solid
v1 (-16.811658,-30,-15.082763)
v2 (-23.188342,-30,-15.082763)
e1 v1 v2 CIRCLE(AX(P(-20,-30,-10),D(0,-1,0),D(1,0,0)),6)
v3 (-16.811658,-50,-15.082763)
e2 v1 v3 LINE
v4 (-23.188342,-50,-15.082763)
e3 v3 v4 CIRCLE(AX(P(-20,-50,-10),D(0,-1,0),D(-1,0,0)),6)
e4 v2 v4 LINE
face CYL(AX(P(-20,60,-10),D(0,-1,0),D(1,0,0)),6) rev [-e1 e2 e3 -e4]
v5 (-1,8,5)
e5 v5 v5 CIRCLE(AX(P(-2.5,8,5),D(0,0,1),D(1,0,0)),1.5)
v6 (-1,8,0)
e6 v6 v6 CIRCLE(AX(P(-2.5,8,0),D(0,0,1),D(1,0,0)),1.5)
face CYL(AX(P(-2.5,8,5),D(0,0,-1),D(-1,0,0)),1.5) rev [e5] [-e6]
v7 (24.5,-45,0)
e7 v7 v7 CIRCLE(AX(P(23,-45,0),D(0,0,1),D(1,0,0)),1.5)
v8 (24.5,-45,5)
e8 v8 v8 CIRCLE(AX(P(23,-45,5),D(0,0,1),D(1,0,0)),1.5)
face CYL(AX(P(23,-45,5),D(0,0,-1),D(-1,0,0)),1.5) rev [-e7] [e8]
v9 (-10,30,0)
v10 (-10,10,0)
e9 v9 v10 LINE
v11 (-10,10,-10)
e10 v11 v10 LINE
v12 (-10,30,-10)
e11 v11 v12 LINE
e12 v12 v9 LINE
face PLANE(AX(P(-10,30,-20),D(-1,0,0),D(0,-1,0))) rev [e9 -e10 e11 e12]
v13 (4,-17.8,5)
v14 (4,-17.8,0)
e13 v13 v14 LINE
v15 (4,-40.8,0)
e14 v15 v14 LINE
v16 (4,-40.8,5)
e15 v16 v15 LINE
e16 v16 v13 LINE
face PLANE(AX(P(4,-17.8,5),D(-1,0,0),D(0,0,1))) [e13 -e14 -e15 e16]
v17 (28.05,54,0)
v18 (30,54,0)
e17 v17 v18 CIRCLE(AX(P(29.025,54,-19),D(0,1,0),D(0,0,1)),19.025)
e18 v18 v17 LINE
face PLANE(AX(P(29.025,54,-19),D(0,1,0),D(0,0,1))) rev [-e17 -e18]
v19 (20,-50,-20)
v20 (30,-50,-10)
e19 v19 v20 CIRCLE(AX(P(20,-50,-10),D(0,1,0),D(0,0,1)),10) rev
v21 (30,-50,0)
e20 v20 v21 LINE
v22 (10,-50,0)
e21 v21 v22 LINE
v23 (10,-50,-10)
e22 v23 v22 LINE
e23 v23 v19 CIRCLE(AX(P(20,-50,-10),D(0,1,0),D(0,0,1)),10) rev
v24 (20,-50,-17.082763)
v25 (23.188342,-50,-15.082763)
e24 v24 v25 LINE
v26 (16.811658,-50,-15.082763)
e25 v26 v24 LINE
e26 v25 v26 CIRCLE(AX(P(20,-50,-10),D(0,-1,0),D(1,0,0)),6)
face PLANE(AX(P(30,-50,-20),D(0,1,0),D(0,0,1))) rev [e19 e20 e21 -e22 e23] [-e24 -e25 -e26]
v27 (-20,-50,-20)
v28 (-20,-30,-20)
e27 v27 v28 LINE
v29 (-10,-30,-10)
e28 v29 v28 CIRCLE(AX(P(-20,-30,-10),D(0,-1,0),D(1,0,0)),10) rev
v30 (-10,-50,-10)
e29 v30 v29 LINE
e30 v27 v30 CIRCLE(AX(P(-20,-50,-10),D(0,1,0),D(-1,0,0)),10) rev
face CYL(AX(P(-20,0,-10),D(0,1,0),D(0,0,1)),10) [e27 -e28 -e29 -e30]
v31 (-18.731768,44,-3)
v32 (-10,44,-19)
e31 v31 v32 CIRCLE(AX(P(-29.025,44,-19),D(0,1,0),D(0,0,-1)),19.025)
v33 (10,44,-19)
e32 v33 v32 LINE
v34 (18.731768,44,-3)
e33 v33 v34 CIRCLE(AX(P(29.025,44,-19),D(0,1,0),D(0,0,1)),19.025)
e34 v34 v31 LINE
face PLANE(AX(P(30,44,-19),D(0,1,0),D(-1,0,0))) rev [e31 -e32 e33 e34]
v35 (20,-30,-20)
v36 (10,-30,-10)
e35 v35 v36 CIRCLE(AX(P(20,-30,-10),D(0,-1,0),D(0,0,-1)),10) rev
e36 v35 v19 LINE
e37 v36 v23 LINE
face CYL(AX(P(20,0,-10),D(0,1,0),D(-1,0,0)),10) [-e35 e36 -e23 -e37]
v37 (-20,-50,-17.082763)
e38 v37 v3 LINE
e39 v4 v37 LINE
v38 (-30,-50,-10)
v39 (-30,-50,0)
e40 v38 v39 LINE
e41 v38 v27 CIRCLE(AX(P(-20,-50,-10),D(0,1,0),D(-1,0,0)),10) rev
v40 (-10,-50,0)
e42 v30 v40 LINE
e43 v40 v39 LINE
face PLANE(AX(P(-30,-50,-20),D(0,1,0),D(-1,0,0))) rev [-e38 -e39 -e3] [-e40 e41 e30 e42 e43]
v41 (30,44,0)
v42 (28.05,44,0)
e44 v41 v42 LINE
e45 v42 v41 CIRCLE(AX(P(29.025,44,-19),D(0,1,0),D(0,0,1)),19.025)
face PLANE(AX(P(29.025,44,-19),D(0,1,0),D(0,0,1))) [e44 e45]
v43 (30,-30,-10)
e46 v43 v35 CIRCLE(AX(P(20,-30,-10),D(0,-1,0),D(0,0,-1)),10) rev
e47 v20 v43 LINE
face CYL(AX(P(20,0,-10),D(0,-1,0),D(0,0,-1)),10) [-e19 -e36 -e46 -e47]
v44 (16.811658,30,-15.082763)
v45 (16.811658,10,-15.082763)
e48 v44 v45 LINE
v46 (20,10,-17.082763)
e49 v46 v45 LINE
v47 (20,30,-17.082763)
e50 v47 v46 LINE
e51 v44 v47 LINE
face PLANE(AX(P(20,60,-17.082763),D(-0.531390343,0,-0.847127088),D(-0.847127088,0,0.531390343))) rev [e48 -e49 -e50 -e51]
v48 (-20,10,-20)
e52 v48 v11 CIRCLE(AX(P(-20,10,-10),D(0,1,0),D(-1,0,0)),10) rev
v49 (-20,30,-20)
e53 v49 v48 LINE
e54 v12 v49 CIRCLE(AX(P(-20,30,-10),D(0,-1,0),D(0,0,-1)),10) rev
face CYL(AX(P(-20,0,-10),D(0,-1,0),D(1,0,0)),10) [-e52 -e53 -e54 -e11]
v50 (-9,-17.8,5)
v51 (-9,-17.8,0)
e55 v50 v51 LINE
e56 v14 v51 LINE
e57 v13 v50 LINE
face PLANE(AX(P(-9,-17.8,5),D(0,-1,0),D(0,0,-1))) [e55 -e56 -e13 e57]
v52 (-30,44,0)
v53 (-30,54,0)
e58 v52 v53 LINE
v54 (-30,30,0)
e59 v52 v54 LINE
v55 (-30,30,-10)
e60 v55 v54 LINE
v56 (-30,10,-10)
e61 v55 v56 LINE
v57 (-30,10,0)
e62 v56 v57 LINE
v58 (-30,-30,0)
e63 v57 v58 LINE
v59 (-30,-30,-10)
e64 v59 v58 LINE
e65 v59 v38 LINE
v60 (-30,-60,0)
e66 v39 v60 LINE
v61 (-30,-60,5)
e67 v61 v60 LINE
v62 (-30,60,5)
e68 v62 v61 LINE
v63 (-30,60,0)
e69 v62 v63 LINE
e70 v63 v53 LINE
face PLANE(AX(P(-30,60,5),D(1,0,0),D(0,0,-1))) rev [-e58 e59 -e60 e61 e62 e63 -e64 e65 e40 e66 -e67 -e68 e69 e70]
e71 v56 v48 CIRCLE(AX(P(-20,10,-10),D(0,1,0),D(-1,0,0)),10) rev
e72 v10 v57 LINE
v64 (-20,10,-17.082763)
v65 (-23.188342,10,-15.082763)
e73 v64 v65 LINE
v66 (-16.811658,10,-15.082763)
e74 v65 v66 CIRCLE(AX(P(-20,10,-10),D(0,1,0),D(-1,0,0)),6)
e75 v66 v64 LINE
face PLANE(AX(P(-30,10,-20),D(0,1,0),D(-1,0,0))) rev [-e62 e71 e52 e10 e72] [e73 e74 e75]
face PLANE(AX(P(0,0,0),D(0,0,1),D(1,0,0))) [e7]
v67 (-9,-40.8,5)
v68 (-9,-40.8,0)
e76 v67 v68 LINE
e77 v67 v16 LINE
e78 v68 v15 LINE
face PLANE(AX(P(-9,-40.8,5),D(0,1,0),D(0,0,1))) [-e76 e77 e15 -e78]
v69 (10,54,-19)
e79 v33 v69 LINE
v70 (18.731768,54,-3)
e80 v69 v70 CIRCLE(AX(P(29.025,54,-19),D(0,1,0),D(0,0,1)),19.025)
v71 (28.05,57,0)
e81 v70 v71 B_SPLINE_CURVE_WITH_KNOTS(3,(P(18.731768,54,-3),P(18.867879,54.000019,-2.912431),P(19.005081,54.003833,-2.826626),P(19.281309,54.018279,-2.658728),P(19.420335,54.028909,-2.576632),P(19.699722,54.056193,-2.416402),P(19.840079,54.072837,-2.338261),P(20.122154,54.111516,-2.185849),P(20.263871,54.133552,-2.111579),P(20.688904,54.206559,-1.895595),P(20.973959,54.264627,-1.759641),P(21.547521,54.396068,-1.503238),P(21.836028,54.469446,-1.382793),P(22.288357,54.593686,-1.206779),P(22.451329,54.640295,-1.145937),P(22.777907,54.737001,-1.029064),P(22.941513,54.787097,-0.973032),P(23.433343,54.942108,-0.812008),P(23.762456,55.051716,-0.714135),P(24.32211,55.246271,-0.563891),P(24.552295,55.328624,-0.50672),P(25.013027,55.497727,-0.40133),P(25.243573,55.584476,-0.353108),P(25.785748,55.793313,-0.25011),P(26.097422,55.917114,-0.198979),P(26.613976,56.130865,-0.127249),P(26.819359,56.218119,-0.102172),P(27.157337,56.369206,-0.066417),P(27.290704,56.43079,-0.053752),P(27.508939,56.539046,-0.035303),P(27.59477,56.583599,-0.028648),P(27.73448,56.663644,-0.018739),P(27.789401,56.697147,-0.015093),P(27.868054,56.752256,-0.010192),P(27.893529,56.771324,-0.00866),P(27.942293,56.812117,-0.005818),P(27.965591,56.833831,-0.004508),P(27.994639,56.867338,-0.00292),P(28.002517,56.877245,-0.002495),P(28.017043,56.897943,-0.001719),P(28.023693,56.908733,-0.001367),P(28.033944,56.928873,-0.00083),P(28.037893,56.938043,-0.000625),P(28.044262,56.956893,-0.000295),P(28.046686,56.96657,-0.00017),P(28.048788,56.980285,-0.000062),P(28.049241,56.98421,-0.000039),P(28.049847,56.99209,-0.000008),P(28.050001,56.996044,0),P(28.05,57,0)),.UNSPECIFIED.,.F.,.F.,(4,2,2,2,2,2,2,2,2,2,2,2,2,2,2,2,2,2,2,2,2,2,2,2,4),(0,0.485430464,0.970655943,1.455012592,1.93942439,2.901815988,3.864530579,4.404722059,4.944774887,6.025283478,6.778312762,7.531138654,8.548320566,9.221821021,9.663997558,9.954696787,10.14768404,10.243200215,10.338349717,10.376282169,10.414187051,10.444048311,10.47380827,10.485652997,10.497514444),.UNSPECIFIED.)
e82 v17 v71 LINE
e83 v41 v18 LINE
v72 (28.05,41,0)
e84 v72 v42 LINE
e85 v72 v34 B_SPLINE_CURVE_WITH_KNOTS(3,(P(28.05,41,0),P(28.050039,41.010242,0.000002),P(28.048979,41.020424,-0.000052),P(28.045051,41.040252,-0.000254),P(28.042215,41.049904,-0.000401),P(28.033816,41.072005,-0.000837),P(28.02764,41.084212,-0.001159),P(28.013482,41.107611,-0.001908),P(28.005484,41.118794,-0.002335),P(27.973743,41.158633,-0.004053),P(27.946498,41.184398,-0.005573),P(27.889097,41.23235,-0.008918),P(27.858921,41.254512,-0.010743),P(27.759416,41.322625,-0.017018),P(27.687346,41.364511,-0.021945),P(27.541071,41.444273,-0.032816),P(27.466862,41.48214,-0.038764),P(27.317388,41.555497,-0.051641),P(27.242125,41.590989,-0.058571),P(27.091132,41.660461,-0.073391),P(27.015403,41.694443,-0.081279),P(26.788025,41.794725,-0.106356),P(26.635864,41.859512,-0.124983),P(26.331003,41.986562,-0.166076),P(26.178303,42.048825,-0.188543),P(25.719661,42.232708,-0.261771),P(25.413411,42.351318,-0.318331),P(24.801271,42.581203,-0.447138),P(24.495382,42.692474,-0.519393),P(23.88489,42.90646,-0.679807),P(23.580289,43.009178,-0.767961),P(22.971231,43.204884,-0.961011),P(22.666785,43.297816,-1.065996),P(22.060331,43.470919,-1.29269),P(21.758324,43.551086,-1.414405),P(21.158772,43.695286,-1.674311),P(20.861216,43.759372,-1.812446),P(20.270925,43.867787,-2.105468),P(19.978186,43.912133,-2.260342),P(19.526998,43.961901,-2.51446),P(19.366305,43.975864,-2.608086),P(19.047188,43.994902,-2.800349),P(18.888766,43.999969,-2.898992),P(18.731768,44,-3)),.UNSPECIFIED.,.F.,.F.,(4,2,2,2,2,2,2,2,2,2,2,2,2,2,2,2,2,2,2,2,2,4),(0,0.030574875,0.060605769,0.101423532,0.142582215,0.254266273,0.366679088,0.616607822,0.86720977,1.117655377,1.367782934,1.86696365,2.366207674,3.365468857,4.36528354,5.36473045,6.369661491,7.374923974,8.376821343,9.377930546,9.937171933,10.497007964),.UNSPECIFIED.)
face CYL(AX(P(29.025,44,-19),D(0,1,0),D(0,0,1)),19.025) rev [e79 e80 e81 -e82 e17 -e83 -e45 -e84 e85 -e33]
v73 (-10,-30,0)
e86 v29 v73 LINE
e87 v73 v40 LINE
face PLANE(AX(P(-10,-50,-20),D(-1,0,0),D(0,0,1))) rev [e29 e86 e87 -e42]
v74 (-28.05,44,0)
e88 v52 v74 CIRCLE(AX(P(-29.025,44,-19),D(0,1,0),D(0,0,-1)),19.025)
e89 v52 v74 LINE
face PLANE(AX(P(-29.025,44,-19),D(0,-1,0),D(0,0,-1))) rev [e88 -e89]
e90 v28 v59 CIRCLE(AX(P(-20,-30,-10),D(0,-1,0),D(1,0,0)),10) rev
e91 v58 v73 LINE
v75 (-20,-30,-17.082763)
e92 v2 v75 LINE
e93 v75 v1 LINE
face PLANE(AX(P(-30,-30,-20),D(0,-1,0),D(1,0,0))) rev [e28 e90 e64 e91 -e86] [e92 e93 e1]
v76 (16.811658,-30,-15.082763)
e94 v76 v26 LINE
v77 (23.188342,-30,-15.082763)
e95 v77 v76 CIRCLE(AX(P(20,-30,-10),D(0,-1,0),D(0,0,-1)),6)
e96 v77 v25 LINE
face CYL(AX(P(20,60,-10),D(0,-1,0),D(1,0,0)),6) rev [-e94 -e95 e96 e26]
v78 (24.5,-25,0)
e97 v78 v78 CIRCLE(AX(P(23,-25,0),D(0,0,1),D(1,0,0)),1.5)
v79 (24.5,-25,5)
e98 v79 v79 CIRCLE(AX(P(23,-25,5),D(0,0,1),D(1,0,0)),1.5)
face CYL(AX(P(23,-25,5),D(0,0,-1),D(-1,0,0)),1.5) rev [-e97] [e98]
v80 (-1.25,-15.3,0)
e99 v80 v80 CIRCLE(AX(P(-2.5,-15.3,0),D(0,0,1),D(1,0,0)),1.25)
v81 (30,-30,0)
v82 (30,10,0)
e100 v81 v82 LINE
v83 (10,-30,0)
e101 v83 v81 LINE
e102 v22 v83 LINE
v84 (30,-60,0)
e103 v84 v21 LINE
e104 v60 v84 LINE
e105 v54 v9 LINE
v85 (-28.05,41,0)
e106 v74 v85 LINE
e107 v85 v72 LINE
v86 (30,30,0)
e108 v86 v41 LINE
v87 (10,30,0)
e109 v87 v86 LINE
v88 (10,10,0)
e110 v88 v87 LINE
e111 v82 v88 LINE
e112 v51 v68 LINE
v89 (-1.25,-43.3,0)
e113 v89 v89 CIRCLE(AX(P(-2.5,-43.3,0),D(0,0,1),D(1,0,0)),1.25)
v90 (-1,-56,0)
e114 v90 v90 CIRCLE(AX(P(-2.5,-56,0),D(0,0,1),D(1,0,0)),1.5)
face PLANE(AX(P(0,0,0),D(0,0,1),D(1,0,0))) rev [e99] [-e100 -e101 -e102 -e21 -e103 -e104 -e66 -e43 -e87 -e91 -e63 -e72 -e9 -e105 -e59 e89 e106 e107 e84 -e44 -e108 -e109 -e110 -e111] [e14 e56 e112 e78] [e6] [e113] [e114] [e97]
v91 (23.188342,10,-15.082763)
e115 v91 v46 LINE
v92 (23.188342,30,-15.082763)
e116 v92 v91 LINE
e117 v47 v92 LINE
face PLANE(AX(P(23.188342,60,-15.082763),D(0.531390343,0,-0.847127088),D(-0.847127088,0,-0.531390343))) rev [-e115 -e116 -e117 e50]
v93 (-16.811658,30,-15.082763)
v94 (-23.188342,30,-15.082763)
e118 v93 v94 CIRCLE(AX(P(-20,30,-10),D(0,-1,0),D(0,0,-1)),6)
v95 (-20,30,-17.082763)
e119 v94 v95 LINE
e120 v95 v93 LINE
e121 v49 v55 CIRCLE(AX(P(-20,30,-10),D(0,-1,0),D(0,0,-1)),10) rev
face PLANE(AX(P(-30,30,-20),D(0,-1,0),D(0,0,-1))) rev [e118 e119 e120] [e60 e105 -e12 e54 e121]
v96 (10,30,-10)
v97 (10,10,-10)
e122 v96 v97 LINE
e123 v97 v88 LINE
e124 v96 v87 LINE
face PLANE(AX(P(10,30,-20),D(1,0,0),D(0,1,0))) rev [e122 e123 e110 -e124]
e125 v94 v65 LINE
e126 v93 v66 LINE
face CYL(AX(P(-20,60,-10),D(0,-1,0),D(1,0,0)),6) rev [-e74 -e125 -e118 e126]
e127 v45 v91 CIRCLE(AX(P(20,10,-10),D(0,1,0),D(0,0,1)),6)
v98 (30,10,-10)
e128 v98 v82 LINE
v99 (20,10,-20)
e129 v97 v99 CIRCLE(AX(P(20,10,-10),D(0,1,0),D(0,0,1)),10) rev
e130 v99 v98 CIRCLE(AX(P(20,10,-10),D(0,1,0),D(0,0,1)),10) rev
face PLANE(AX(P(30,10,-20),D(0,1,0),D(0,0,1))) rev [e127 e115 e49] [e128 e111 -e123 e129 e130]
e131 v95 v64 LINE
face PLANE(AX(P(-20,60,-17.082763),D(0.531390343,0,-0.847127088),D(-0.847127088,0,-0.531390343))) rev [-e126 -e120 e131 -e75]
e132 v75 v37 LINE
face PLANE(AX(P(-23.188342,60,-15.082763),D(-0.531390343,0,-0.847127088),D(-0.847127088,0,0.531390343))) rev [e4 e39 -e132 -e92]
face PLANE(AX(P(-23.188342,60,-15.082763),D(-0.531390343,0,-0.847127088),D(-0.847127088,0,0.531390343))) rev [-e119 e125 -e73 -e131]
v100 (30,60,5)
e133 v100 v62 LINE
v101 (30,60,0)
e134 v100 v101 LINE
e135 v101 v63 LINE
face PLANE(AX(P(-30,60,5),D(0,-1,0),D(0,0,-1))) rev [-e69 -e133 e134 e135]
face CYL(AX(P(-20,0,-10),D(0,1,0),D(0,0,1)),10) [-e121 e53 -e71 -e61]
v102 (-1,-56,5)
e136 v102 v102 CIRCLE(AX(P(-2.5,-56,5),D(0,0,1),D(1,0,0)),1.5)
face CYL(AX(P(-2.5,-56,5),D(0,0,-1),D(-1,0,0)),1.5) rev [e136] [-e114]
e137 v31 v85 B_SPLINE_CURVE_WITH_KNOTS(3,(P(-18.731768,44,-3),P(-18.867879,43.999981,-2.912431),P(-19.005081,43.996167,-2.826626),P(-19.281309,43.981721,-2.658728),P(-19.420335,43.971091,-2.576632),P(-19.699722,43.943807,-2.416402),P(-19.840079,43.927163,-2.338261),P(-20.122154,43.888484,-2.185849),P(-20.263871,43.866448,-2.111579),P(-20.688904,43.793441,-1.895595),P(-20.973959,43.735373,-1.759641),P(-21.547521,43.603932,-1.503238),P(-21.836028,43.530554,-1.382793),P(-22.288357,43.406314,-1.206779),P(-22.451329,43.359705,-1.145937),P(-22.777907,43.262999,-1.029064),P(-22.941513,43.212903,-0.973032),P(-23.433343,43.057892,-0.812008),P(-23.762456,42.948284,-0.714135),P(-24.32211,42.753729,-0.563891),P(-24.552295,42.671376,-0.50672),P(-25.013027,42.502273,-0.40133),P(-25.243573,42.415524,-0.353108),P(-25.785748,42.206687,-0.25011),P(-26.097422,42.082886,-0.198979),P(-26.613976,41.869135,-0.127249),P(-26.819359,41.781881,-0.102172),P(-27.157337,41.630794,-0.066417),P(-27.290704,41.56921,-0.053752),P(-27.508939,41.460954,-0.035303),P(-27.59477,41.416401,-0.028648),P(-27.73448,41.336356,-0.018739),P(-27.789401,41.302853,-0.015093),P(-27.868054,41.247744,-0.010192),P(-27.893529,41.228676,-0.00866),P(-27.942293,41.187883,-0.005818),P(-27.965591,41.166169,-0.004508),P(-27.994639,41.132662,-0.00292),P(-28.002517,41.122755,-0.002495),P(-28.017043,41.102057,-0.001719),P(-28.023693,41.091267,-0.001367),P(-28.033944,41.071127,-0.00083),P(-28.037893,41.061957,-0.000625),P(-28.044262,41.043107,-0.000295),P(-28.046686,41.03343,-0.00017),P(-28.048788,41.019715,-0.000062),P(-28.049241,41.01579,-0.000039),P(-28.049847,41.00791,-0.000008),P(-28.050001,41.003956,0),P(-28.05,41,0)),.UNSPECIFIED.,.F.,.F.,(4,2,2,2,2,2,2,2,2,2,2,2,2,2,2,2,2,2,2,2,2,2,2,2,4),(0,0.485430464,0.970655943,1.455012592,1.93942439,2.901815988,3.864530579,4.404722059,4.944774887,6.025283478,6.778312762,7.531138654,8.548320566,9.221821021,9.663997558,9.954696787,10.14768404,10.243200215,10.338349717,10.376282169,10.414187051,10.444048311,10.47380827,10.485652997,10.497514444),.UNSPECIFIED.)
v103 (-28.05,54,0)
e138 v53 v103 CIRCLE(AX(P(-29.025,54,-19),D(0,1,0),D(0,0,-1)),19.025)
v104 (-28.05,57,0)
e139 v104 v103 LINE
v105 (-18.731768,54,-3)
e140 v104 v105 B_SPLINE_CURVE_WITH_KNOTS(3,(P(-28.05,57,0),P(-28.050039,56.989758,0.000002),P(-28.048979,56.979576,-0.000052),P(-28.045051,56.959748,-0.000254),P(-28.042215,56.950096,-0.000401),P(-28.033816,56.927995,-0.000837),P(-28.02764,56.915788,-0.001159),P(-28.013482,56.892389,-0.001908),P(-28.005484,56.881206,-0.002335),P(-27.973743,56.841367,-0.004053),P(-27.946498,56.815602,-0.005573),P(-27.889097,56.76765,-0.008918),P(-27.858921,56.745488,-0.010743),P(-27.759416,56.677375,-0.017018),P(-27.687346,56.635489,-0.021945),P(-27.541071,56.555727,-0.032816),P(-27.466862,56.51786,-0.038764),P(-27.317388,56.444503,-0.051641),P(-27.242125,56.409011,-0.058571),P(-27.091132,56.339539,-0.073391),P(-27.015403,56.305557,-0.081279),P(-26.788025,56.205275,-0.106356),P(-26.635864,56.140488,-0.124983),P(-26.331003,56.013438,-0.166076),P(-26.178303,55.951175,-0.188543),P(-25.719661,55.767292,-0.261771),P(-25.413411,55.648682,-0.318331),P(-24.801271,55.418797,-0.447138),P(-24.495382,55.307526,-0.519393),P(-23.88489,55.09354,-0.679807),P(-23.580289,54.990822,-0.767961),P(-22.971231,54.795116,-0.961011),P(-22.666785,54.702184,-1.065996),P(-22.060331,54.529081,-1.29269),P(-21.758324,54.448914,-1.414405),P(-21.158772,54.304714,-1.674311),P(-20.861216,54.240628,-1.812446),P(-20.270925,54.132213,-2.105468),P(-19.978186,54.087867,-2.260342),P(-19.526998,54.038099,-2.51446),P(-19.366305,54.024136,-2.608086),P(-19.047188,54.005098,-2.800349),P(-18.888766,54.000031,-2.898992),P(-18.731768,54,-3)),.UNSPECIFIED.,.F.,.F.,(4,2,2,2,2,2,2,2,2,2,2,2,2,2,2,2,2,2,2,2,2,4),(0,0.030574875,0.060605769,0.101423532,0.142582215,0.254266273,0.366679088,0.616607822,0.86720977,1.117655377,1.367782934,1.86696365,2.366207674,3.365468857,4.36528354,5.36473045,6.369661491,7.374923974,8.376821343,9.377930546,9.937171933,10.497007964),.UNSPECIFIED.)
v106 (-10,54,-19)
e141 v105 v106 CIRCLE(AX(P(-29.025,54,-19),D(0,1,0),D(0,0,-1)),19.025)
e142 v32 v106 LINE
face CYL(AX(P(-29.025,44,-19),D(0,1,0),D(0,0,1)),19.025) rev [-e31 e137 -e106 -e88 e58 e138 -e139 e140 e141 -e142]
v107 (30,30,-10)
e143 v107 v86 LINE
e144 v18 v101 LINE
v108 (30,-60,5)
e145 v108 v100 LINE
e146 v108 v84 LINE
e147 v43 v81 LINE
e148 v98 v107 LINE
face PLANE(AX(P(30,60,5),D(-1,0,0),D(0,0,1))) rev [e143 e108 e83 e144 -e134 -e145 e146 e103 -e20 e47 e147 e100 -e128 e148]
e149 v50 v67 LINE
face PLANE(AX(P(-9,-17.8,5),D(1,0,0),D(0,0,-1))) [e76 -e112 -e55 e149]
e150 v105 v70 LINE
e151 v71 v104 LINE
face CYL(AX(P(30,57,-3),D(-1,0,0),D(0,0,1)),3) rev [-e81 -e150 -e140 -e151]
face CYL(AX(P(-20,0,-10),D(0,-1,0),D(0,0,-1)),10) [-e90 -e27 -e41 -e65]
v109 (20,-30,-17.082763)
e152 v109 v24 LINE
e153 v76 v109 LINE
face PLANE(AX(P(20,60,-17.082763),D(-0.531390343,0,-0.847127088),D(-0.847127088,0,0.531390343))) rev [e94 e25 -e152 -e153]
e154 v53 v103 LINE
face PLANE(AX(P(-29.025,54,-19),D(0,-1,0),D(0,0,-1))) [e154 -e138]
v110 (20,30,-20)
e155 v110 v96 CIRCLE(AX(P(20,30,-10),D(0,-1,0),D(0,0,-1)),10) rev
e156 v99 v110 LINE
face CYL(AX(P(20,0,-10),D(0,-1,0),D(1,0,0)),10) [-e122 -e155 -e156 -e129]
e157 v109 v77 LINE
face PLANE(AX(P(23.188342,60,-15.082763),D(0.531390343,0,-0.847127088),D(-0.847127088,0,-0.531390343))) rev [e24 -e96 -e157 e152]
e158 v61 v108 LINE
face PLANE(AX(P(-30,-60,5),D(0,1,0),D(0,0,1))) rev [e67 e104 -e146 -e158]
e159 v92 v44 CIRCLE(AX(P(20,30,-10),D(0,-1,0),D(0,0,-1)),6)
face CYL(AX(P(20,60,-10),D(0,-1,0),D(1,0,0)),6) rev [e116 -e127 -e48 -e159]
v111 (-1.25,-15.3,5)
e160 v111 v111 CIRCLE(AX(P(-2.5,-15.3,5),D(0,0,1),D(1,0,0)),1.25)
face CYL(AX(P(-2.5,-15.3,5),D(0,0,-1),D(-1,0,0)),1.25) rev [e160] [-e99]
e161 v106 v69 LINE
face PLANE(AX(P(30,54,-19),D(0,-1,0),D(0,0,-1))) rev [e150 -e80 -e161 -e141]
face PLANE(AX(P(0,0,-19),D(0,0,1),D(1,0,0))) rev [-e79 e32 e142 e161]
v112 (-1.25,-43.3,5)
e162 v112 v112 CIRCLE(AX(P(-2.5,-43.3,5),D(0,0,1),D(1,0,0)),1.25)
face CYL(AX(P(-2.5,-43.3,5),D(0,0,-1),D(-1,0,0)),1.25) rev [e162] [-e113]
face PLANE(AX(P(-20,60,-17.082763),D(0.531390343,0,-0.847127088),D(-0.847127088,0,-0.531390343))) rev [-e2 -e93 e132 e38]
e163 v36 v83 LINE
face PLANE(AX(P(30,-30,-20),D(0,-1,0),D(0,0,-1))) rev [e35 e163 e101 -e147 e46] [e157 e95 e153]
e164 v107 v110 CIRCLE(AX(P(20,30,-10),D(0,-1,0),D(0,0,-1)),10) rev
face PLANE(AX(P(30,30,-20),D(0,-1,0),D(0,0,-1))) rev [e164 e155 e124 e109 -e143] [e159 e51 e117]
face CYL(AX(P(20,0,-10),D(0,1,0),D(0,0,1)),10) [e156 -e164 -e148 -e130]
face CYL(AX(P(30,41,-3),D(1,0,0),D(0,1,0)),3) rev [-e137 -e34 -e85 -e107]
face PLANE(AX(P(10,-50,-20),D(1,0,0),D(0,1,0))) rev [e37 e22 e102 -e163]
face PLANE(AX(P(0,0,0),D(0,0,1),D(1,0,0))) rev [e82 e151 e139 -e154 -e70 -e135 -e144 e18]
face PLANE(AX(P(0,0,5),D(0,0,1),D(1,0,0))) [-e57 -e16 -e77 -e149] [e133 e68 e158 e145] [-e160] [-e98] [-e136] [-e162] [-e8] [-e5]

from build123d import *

# Parameters (mm, degrees)
SKETCH1_W           = 60
SKETCH1_H           = 120
SKETCH1_R           = 1.5
SKETCH1_R_2         = 1.25
SKETCH1_W_2         = 13
SKETCH1_H_2         = 23
BOSS_EXTRUDE1_DEPTH = 5
SKETCH2_W           = 20
SKETCH2_H           = 20
BOSS_EXTRUDE2_DEPTH = 20
CUT_EXTRUDE1_DEPTH  = 116.758369028
FILLET1_R           = 10
SKETCH4_W           = 60
SKETCH4_H           = 10
BOSS_EXTRUDE3_DEPTH = 19
CUT_EXTRUDE2_DEPTH  = 10
FILLET2_R           = 3


with BuildPart() as part:
    # Sketch1 → Boss-Extrude1 (new body)
    with BuildSketch(Plane.XY):
        Rectangle(SKETCH1_W, SKETCH1_H)
        with Locations((23, -25)):
            Circle(SKETCH1_R, mode=Mode.SUBTRACT)
        with Locations((23, -45)):
            Circle(SKETCH1_R, mode=Mode.SUBTRACT)
        with Locations((-2.5, -56)):
            Circle(SKETCH1_R, mode=Mode.SUBTRACT)
        with Locations((-2.5, 8)):
            Circle(SKETCH1_R, mode=Mode.SUBTRACT)
        with Locations((-2.5, -15.3)):
            Circle(SKETCH1_R_2, mode=Mode.SUBTRACT)
        with Locations((-2.5, -43.3)):
            Circle(SKETCH1_R_2, mode=Mode.SUBTRACT)
        with Locations((-2.5, -29.3)):
            Rectangle(SKETCH1_W_2, SKETCH1_H_2, mode=Mode.SUBTRACT)
    extrude(amount=BOSS_EXTRUDE1_DEPTH)

    # Sketch2 → Boss-Extrude2 (add)
    with BuildSketch(Plane(origin=(0, 0, 0), x_dir=(-1, 0, 0), z_dir=(0, 0, -1))):
        with Locations((-20, -40)):
            Rectangle(SKETCH2_W, SKETCH2_H)
        with Locations((20, -40)):
            Rectangle(SKETCH2_W, SKETCH2_H)
        with Locations((20, 20)):
            Rectangle(SKETCH2_W, SKETCH2_H)
        with Locations((-20, 20)):
            Rectangle(SKETCH2_W, SKETCH2_H)
    extrude(amount=BOSS_EXTRUDE2_DEPTH)

    # Sketch3 → Cut-Extrude1 (cut, through all)
    with BuildSketch(Plane.XZ.offset(50)):
        with BuildLine():
            Line((-23.188342055, -15.08276253), (-20, -17.08276253))
            Line((-20, -17.08276253), (-16.811657945, -15.08276253))
            ThreePointArc((-16.811657945, -15.08276253), (-20, -4), (-23.188342055, -15.08276253))
        make_face()
        with BuildLine():
            Line((20, -17.08276253), (16.811657945, -15.08276253))
            ThreePointArc((16.811657945, -15.08276253), (20, -4), (23.188342055, -15.08276253))
            Line((23.188342055, -15.08276253), (20, -17.08276253))
        make_face()
    extrude(amount=-CUT_EXTRUDE1_DEPTH, mode=Mode.SUBTRACT)

    # Fillet1
    fillet1_edges = [part.edges().sort_by_distance(p)[0] for p in [
        (-10, -40, -20),
        (-30, -40, -20),
        (-30, 20, -20),
        (-10, 20, -20),
        (30, 20, -20),
        (10, 20, -20),
        (10, -40, -20),
        (30, -40, -20),
    ]]
    fillet(fillet1_edges, radius=FILLET1_R - 0.0001)  # a hair under: the kernel refuses the full size

    # Sketch4 → Boss-Extrude3 (add)
    with BuildSketch(Plane(origin=(0, 0, 0), x_dir=(-1, 0, 0), z_dir=(0, 0, -1))):
        with Locations((0, 49)):
            Rectangle(SKETCH4_W, SKETCH4_H)
    extrude(amount=BOSS_EXTRUDE3_DEPTH)

    # Sketch5 → Cut-Extrude2 (cut)
    with BuildSketch(Plane(origin=(0, 54, 0), x_dir=(1, 0, 0), z_dir=(0, 1, 0))):
        with BuildLine():
            Line((-10, 19), (-30, 19))
            Line((-30, 19), (-30, 0))
            ThreePointArc((-30, 0), (-15.921541487, 5.206885776), (-10, 19))
        make_face()
        with BuildLine():
            Line((10, 19), (30, 19))
            Line((30, 19), (30, 0))
            ThreePointArc((30, 0), (15.921541487, 5.206885776), (10, 19))
        make_face()
    extrude(amount=-CUT_EXTRUDE2_DEPTH, mode=Mode.SUBTRACT)

    # Fillet2
    fillet2_edges = [part.edges().sort_by_distance(p)[0] for p in [
        (0, 44, 0),
        (0, 54, 0),
    ]]
    fillet(fillet2_edges, radius=FILLET2_R)


solid = part.part
